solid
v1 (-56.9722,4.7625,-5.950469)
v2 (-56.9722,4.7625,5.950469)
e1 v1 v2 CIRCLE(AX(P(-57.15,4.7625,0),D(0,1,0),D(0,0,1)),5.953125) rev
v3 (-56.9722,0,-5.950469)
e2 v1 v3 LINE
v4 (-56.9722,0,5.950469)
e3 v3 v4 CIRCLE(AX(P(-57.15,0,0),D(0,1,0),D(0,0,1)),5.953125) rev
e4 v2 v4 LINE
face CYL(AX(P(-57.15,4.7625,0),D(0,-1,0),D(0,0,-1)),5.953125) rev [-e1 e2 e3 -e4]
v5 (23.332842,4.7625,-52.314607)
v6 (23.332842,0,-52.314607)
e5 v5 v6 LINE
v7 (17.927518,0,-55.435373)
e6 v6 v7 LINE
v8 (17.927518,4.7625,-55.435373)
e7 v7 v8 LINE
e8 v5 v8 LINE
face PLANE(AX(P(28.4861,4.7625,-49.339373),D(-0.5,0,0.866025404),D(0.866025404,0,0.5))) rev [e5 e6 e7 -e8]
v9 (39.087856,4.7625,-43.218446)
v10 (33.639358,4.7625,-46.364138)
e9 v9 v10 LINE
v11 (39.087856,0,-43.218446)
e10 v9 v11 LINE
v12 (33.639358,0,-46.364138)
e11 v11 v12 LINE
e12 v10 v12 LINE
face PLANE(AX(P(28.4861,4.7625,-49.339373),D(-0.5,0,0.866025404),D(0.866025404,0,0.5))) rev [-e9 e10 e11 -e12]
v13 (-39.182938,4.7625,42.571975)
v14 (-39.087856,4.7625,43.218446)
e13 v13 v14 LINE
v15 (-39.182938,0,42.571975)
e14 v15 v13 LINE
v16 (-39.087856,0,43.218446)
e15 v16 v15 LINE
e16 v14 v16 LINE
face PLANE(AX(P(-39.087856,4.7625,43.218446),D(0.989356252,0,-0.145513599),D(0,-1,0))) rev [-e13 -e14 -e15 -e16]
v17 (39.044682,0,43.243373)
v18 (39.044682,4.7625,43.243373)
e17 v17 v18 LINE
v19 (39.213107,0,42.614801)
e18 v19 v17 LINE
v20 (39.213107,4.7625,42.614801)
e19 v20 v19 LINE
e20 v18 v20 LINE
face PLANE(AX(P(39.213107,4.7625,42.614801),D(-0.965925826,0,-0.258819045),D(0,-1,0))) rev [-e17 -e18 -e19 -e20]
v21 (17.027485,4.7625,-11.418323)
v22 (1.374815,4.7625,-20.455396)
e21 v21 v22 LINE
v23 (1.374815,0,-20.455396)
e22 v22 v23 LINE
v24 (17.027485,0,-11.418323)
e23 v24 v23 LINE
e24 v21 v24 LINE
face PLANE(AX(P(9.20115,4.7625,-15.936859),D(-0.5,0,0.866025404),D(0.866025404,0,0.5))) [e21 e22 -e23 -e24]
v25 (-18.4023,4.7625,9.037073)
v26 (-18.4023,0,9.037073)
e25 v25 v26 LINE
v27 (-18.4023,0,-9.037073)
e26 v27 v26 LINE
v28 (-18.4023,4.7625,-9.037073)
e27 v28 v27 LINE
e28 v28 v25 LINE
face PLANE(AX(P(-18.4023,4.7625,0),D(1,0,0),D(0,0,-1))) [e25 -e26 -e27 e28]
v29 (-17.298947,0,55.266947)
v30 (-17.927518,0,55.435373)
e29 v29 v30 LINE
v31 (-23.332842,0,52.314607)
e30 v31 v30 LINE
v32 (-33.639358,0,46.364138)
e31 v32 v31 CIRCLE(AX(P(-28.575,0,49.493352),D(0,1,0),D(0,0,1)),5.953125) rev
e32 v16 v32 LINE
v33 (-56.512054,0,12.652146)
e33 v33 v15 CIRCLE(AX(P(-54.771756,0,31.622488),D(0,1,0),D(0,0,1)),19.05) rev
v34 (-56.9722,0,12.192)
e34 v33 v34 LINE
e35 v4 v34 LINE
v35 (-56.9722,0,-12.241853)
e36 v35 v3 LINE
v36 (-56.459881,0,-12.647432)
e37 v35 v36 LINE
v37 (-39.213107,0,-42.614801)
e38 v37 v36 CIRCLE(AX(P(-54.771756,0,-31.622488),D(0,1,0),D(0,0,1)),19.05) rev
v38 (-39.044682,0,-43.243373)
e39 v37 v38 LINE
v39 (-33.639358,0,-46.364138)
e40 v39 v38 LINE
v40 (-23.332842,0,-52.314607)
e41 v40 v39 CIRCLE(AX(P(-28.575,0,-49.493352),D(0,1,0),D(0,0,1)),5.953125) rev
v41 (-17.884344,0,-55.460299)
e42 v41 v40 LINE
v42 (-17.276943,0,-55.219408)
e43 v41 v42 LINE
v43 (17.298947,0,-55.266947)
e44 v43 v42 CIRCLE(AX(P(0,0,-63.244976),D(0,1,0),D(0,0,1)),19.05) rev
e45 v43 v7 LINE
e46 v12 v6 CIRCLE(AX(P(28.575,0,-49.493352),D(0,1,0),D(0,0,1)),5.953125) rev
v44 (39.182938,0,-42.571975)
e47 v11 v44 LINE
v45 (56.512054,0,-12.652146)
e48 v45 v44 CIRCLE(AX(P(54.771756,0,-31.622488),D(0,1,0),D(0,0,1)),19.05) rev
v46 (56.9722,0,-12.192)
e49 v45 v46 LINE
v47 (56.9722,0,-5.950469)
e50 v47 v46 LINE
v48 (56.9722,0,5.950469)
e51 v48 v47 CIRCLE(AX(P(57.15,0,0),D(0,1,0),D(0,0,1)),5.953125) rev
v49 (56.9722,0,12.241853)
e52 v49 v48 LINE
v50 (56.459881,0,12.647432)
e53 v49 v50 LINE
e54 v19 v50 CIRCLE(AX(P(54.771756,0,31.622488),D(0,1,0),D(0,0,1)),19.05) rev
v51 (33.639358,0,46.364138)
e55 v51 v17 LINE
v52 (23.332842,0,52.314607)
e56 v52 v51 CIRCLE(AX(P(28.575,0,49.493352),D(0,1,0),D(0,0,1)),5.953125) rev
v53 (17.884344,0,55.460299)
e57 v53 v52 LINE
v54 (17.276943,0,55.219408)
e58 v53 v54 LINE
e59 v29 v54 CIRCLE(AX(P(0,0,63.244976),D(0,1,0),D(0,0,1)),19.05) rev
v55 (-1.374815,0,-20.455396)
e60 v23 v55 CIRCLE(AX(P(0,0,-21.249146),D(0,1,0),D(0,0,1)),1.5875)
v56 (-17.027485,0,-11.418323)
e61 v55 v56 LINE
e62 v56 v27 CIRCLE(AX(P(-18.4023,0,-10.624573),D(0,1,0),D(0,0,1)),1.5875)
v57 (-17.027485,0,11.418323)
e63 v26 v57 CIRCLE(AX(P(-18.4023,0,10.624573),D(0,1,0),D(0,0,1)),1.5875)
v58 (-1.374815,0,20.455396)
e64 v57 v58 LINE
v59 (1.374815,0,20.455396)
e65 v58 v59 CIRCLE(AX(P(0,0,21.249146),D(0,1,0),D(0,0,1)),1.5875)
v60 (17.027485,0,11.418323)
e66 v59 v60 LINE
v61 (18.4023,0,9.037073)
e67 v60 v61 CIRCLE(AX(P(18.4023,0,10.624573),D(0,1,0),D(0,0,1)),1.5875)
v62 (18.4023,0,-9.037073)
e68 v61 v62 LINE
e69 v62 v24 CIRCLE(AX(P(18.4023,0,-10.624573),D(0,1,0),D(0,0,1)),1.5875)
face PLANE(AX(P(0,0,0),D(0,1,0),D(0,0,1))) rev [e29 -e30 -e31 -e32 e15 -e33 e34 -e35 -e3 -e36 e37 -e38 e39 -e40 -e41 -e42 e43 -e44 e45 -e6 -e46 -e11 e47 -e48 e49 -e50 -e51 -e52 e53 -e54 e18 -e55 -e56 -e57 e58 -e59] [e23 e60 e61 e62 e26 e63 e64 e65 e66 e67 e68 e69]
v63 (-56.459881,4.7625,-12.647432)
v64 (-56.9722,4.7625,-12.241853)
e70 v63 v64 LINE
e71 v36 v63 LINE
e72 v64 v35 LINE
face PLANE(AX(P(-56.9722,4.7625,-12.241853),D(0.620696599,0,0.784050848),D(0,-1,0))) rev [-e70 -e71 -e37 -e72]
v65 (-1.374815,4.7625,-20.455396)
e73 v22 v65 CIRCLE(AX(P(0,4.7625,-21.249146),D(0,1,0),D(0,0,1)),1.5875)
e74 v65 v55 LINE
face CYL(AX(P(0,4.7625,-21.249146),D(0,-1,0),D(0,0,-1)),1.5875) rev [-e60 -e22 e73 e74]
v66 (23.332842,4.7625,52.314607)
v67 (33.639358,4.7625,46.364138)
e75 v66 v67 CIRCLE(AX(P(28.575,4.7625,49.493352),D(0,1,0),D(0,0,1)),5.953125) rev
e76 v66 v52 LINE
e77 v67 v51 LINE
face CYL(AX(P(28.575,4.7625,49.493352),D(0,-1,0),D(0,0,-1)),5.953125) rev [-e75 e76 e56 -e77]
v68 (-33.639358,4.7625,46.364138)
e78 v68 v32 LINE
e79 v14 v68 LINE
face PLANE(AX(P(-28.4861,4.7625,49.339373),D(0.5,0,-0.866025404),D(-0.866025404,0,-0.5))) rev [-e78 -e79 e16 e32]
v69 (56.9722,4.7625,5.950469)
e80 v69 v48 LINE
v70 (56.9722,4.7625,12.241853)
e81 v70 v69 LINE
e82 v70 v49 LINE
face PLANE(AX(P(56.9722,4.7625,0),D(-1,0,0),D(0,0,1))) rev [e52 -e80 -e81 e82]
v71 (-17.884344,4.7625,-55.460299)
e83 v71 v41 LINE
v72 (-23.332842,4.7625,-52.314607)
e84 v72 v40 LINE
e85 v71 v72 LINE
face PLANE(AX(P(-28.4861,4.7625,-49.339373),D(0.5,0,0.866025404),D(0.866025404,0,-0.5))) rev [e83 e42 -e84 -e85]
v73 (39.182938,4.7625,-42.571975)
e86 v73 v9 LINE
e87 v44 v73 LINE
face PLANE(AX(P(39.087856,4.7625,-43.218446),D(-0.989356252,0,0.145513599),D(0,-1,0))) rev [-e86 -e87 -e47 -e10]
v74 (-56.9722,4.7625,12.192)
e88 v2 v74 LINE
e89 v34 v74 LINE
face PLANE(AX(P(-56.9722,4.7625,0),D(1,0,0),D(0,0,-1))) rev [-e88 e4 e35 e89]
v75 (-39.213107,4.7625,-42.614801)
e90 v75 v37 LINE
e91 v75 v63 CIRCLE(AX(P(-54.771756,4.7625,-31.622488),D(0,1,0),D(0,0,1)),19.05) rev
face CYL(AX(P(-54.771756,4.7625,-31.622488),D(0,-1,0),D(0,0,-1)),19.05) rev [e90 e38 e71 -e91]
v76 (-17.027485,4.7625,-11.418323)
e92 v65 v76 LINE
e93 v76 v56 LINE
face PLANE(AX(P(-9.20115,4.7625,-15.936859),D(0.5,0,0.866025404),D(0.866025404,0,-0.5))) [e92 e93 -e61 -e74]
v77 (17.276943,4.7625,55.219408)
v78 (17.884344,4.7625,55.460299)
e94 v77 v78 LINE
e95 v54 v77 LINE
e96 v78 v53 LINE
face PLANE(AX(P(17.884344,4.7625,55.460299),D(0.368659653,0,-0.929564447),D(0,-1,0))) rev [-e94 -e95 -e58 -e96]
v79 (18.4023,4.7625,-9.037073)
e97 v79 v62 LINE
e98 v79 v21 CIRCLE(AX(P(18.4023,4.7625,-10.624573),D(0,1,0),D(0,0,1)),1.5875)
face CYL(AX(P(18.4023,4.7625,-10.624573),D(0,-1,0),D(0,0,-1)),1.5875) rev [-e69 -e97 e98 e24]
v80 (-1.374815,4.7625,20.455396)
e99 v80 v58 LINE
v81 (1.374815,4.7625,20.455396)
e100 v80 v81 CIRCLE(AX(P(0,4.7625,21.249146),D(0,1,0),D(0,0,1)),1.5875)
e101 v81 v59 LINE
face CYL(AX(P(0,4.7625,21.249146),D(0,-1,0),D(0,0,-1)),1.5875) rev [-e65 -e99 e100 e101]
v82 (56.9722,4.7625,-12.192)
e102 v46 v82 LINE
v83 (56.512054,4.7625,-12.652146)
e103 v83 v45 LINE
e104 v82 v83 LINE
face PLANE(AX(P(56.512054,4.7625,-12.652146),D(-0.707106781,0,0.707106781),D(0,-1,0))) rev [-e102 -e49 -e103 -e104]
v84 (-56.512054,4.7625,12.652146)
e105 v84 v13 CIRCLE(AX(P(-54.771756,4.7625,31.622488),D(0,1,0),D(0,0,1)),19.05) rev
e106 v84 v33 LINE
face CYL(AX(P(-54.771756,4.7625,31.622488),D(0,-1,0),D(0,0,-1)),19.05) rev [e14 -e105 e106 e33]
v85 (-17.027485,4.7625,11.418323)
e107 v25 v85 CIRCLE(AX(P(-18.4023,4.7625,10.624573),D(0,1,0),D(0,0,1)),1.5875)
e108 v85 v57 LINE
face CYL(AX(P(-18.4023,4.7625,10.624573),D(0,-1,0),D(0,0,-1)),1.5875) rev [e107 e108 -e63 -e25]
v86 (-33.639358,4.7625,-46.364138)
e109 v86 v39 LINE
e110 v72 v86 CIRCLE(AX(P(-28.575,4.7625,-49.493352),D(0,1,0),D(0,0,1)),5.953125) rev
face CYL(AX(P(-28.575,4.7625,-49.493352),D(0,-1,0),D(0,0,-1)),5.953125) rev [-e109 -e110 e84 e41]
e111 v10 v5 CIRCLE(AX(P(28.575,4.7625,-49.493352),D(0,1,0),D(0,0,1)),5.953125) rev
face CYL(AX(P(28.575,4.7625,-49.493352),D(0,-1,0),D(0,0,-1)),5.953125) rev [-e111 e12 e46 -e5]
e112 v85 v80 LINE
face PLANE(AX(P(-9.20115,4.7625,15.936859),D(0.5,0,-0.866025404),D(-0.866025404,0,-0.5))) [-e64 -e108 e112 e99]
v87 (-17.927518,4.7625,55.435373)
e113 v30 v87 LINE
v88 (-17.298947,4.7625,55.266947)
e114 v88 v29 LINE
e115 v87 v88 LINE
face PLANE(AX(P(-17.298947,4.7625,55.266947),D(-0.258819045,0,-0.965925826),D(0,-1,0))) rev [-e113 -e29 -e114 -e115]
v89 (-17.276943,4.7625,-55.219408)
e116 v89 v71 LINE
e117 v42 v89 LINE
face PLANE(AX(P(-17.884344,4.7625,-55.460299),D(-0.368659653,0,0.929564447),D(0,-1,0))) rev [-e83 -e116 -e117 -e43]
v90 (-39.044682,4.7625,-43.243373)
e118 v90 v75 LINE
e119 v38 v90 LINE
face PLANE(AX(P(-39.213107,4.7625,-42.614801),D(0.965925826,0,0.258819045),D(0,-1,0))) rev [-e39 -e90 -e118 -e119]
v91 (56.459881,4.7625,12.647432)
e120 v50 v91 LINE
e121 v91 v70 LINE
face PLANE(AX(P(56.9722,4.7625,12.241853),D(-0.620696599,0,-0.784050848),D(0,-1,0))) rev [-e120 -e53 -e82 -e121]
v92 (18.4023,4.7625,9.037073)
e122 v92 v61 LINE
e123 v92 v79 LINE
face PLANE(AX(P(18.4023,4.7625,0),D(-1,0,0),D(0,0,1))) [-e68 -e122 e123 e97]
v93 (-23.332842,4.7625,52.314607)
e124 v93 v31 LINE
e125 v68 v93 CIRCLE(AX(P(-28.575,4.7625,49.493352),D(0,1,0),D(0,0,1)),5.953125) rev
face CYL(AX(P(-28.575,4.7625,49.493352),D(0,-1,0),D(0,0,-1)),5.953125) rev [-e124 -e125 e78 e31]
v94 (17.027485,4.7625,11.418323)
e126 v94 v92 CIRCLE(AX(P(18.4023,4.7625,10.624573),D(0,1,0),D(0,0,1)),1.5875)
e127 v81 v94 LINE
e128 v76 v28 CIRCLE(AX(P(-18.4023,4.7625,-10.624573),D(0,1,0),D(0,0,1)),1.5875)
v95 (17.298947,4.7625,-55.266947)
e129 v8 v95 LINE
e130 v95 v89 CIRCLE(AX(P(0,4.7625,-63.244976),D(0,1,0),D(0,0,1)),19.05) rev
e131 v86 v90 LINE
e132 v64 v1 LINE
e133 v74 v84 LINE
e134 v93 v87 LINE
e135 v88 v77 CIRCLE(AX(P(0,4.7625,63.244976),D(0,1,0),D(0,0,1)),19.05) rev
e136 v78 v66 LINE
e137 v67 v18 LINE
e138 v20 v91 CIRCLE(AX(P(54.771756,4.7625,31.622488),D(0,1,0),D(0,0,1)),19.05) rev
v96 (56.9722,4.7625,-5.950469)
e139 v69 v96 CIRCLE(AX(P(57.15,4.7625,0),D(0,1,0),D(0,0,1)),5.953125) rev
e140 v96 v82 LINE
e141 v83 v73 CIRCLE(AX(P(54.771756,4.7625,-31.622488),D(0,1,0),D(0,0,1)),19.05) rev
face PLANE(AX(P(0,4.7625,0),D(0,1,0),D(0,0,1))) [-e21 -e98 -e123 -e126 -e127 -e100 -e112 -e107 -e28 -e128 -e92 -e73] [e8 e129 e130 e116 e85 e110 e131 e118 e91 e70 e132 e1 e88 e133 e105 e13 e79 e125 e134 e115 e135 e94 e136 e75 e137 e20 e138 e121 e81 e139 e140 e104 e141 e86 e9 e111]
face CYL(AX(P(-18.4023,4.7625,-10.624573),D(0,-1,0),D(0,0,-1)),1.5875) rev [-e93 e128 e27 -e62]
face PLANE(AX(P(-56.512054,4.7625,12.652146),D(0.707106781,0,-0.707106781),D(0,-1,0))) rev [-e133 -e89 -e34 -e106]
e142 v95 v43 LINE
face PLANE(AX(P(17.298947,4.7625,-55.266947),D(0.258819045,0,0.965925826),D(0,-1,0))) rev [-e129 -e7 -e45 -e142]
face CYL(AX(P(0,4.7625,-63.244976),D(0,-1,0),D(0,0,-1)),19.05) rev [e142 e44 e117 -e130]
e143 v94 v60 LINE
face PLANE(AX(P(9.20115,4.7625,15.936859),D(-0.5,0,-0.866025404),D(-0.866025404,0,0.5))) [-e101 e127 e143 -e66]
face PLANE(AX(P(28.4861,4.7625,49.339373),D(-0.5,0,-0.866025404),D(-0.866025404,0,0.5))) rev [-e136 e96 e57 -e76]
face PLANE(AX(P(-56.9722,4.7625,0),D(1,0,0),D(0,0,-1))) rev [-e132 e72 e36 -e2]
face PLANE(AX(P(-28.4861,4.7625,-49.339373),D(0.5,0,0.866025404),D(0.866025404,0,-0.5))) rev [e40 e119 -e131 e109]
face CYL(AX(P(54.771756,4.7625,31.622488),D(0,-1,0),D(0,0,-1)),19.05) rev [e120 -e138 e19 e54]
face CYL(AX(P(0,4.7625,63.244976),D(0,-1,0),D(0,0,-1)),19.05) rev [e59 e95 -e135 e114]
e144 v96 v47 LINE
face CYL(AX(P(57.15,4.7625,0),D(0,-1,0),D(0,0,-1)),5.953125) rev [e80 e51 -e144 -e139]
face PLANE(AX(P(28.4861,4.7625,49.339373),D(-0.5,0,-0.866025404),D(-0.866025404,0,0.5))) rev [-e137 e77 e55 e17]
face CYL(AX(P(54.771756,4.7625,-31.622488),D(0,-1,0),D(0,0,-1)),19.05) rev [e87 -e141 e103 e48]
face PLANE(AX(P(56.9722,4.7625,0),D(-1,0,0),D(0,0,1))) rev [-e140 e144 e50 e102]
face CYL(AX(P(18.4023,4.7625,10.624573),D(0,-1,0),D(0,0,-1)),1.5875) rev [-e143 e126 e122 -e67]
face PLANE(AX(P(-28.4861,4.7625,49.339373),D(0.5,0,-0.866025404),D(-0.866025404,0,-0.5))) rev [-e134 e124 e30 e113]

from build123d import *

# Parameters (mm, degrees)
BOSS_EXTRUDE1_DEPTH = 4.7625
CHAMFER1_SIZE       = 0.458146619
CHAMFER1_SIZE_2     = 0.508


with BuildPart() as part:
    # Sketch1 → Boss-Extrude1 (new body)
    with BuildSketch(Plane(origin=(0, 0, 0), x_dir=(1, 0, 0), z_dir=(0, 1, 0))):
        with BuildLine():
            ThreePointArc((-39.484622628, 42.989372509), (-38.273971566, 22.097487787), (-56.9722, 12.7))
            Line((-56.9722, 12.7), (-56.9722, 5.950469261))
            ThreePointArc((-56.9722, 5.950469261), (-51.196875, 0), (-56.9722, -5.950469261))
            Line((-56.9722, -5.950469261), (-56.9722, -12.7))
            ThreePointArc((-56.9722, -12.7), (-38.273971566, -22.097487787), (-39.484622628, -42.989372509))
            Line((-39.484622628, -42.989372509), (-33.639357544, -46.364137879))
            ThreePointArc((-33.639357544, -46.364137879), (-25.5984375, -44.337794344), (-23.332842456, -52.31460714))
            Line((-23.332842456, -52.31460714), (-17.487577372, -55.689372509))
            ThreePointArc((-17.487577372, -55.689372509), (0, -44.194975573), (17.487577372, -55.689372509))
            Line((17.487577372, -55.689372509), (23.332842456, -52.31460714))
            ThreePointArc((23.332842456, -52.31460714), (25.5984375, -44.337794344), (33.639357544, -46.364137879))
            Line((33.639357544, -46.364137879), (39.484622628, -42.989372509))
            ThreePointArc((39.484622628, -42.989372509), (38.273971566, -22.097487787), (56.9722, -12.7))
            Line((56.9722, -12.7), (56.9722, -5.950469261))
            ThreePointArc((56.9722, -5.950469261), (51.196875, 0), (56.9722, 5.950469261))
            Line((56.9722, 5.950469261), (56.9722, 12.7))
            ThreePointArc((56.9722, 12.7), (38.273971566, 22.097487787), (39.484622628, 42.989372509))
            Line((39.484622628, 42.989372509), (33.639357544, 46.364137879))
            ThreePointArc((33.639357544, 46.364137879), (25.5984375, 44.337794344), (23.332842456, 52.31460714))
            Line((23.332842456, 52.31460714), (17.487577372, 55.689372509))
            ThreePointArc((17.487577372, 55.689372509), (0, 44.194975573), (-17.487577372, 55.689372509))
            Line((-17.487577372, 55.689372509), (-23.332842456, 52.31460714))
            ThreePointArc((-23.332842456, 52.31460714), (-25.5984375, 44.337794344), (-33.639357544, 46.364137879))
            Line((-33.639357544, 46.364137879), (-39.484622628, 42.989372509))
        make_face()
        with BuildLine():
            Line((1.374815329, 20.455395717), (17.027484671, 11.418322859))
            ThreePointArc((17.027484671, 11.418322859), (18.813175234, 12.157980108), (19.9898, 10.624572859))
            ThreePointArc((19.9898, 10.624572859), (19.524832015, 9.502040844), (18.4023, 9.037072859))
            Line((18.4023, 9.037072859), (18.4023, -9.037072859))
            ThreePointArc((18.4023, -9.037072859), (19.524832015, -9.502040844), (19.9898, -10.624572859))
            ThreePointArc((19.9898, -10.624572859), (18.813175234, -12.157980108), (17.027484671, -11.418322859))
            Line((17.027484671, -11.418322859), (1.374815329, -20.455395717))
            ThreePointArc((1.374815329, -20.455395717), (1.533407249, -20.838270483), (1.5875, -21.249145717))
            ThreePointArc((1.5875, -21.249145717), (-0.410875234, -22.782552967), (-1.374815329, -20.455395717))
            Line((-1.374815329, -20.455395717), (-17.027484671, -11.418322859))
            ThreePointArc((-17.027484671, -11.418322859), (-19.777115329, -11.418322859), (-18.4023, -9.037072859))
            Line((-18.4023, -9.037072859), (-18.4023, 9.037072859))
            ThreePointArc((-18.4023, 9.037072859), (-19.777115329, 11.418322859), (-17.027484671, 11.418322859))
            Line((-17.027484671, 11.418322859), (-1.374815329, 20.455395717))
            ThreePointArc((-1.374815329, 20.455395717), (-0.410875234, 22.782552967), (1.5875, 21.249145717))
            ThreePointArc((1.5875, 21.249145717), (1.533407249, 20.838270483), (1.374815329, 20.455395717))
        make_face(mode=Mode.SUBTRACT)
    extrude(amount=BOSS_EXTRUDE1_DEPTH)

    # Chamfer1
    # the kernel refuses this chamfer: 0.508, 0.458146619 mm, written as the material it takes off along each edge
    with BuildSketch(Plane(origin=(-39.484622628, -1.324398774, 42.989372509), x_dir=(0.8660254037844506, 0, 0.49999999999997935), z_dir=(0, 1, 0)), Plane(origin=(-56.9722, -1.324398774, -12.7), x_dir=(0, 0, 1), z_dir=(0, 1, 0)), Plane(origin=(-17.487577372, -1.324398774, -55.689372509), x_dir=(-0.8660254037844313, 0, 0.5000000000000127), z_dir=(0, 1, 0)), Plane(origin=(39.484622628, -1.324398774, -42.989372509), x_dir=(-0.86602540378444, 0, -0.4999999999999977), z_dir=(0, 1, 0)), Plane(origin=(56.9722, -1.324398774, 12.7), x_dir=(0, 0, -1), z_dir=(0, 1, 0)), Plane(origin=(17.487577372, -1.324398774, 55.689372509), x_dir=(0.8660254037844486, 0, -0.4999999999999827), z_dir=(0, 1, 0))) as chamfer1_piece_1:
        with BuildLine():
            Line((CHAMFER1_SIZE, 0), (0.052567717, 0.512318712))
            ThreePointArc((0.052567717, 0.512318712), (0.028757334, 0.263227837), (0, 0))
            Line((0, 0), (CHAMFER1_SIZE, 0))
        make_face()
    extrude(amount=7.411297548, mode=Mode.SUBTRACT)
    with BuildSketch(Plane(origin=(-56.9722, -1.306414958, 12.7), x_dir=(0.9946357789180702, 0, -0.10343919613011188), z_dir=(0, 1, 0)), Plane(origin=(-39.484622628, -1.306414958, -42.989372509), x_dir=(0.5868988610547448, 0, 0.8096602539909213), z_dir=(0, 1, 0)), Plane(origin=(56.9722, -1.306414958, -12.7), x_dir=(-0.9946357789180716, 0, 0.1034391961300989), z_dir=(0, 1, 0)), Plane(origin=(39.484622628, -1.306414958, 42.989372509), x_dir=(-0.5868988610547374, 0, -0.8096602539909268), z_dir=(0, 1, 0)), Plane(origin=(-17.487577372, -1.306414958, 55.689372509), x_dir=(0.40773691786333366, 0, -0.91309945012102), z_dir=(0, 1, 0))) as chamfer1_piece_2:
        with BuildLine():
            Line((0.462627791, 0), (CHAMFER1_SIZE_2 * 0.10343919613, CHAMFER1_SIZE_2 * 0.994635778918))
            Line((CHAMFER1_SIZE_2 * 0.10343919613, CHAMFER1_SIZE_2 * 0.994635778918), (0, 0))
            ThreePointArc((0, 0), (0.237719559, 0.001403335), (0.462627791, 0))
        make_face()
    extrude(amount=7.375329916, mode=Mode.SUBTRACT)
    with BuildSketch(Plane(origin=(17.487577372, -1.306414958, -55.689372509), x_dir=(0.8660254037844403, 0, 0.49999999999999717), z_dir=(0, 1, 0))) as chamfer1_piece_3:
        with BuildLine():
            Line((CHAMFER1_SIZE_2, 0), (0.047853847, -0.460146153))
            ThreePointArc((0.047853847, -0.460146153), (0.025985327, -0.236299219), (0, 0))
            Line((0, 0), (CHAMFER1_SIZE_2, 0))
        make_face()
    extrude(amount=7.375329916, mode=Mode.SUBTRACT)


solid = part.part
